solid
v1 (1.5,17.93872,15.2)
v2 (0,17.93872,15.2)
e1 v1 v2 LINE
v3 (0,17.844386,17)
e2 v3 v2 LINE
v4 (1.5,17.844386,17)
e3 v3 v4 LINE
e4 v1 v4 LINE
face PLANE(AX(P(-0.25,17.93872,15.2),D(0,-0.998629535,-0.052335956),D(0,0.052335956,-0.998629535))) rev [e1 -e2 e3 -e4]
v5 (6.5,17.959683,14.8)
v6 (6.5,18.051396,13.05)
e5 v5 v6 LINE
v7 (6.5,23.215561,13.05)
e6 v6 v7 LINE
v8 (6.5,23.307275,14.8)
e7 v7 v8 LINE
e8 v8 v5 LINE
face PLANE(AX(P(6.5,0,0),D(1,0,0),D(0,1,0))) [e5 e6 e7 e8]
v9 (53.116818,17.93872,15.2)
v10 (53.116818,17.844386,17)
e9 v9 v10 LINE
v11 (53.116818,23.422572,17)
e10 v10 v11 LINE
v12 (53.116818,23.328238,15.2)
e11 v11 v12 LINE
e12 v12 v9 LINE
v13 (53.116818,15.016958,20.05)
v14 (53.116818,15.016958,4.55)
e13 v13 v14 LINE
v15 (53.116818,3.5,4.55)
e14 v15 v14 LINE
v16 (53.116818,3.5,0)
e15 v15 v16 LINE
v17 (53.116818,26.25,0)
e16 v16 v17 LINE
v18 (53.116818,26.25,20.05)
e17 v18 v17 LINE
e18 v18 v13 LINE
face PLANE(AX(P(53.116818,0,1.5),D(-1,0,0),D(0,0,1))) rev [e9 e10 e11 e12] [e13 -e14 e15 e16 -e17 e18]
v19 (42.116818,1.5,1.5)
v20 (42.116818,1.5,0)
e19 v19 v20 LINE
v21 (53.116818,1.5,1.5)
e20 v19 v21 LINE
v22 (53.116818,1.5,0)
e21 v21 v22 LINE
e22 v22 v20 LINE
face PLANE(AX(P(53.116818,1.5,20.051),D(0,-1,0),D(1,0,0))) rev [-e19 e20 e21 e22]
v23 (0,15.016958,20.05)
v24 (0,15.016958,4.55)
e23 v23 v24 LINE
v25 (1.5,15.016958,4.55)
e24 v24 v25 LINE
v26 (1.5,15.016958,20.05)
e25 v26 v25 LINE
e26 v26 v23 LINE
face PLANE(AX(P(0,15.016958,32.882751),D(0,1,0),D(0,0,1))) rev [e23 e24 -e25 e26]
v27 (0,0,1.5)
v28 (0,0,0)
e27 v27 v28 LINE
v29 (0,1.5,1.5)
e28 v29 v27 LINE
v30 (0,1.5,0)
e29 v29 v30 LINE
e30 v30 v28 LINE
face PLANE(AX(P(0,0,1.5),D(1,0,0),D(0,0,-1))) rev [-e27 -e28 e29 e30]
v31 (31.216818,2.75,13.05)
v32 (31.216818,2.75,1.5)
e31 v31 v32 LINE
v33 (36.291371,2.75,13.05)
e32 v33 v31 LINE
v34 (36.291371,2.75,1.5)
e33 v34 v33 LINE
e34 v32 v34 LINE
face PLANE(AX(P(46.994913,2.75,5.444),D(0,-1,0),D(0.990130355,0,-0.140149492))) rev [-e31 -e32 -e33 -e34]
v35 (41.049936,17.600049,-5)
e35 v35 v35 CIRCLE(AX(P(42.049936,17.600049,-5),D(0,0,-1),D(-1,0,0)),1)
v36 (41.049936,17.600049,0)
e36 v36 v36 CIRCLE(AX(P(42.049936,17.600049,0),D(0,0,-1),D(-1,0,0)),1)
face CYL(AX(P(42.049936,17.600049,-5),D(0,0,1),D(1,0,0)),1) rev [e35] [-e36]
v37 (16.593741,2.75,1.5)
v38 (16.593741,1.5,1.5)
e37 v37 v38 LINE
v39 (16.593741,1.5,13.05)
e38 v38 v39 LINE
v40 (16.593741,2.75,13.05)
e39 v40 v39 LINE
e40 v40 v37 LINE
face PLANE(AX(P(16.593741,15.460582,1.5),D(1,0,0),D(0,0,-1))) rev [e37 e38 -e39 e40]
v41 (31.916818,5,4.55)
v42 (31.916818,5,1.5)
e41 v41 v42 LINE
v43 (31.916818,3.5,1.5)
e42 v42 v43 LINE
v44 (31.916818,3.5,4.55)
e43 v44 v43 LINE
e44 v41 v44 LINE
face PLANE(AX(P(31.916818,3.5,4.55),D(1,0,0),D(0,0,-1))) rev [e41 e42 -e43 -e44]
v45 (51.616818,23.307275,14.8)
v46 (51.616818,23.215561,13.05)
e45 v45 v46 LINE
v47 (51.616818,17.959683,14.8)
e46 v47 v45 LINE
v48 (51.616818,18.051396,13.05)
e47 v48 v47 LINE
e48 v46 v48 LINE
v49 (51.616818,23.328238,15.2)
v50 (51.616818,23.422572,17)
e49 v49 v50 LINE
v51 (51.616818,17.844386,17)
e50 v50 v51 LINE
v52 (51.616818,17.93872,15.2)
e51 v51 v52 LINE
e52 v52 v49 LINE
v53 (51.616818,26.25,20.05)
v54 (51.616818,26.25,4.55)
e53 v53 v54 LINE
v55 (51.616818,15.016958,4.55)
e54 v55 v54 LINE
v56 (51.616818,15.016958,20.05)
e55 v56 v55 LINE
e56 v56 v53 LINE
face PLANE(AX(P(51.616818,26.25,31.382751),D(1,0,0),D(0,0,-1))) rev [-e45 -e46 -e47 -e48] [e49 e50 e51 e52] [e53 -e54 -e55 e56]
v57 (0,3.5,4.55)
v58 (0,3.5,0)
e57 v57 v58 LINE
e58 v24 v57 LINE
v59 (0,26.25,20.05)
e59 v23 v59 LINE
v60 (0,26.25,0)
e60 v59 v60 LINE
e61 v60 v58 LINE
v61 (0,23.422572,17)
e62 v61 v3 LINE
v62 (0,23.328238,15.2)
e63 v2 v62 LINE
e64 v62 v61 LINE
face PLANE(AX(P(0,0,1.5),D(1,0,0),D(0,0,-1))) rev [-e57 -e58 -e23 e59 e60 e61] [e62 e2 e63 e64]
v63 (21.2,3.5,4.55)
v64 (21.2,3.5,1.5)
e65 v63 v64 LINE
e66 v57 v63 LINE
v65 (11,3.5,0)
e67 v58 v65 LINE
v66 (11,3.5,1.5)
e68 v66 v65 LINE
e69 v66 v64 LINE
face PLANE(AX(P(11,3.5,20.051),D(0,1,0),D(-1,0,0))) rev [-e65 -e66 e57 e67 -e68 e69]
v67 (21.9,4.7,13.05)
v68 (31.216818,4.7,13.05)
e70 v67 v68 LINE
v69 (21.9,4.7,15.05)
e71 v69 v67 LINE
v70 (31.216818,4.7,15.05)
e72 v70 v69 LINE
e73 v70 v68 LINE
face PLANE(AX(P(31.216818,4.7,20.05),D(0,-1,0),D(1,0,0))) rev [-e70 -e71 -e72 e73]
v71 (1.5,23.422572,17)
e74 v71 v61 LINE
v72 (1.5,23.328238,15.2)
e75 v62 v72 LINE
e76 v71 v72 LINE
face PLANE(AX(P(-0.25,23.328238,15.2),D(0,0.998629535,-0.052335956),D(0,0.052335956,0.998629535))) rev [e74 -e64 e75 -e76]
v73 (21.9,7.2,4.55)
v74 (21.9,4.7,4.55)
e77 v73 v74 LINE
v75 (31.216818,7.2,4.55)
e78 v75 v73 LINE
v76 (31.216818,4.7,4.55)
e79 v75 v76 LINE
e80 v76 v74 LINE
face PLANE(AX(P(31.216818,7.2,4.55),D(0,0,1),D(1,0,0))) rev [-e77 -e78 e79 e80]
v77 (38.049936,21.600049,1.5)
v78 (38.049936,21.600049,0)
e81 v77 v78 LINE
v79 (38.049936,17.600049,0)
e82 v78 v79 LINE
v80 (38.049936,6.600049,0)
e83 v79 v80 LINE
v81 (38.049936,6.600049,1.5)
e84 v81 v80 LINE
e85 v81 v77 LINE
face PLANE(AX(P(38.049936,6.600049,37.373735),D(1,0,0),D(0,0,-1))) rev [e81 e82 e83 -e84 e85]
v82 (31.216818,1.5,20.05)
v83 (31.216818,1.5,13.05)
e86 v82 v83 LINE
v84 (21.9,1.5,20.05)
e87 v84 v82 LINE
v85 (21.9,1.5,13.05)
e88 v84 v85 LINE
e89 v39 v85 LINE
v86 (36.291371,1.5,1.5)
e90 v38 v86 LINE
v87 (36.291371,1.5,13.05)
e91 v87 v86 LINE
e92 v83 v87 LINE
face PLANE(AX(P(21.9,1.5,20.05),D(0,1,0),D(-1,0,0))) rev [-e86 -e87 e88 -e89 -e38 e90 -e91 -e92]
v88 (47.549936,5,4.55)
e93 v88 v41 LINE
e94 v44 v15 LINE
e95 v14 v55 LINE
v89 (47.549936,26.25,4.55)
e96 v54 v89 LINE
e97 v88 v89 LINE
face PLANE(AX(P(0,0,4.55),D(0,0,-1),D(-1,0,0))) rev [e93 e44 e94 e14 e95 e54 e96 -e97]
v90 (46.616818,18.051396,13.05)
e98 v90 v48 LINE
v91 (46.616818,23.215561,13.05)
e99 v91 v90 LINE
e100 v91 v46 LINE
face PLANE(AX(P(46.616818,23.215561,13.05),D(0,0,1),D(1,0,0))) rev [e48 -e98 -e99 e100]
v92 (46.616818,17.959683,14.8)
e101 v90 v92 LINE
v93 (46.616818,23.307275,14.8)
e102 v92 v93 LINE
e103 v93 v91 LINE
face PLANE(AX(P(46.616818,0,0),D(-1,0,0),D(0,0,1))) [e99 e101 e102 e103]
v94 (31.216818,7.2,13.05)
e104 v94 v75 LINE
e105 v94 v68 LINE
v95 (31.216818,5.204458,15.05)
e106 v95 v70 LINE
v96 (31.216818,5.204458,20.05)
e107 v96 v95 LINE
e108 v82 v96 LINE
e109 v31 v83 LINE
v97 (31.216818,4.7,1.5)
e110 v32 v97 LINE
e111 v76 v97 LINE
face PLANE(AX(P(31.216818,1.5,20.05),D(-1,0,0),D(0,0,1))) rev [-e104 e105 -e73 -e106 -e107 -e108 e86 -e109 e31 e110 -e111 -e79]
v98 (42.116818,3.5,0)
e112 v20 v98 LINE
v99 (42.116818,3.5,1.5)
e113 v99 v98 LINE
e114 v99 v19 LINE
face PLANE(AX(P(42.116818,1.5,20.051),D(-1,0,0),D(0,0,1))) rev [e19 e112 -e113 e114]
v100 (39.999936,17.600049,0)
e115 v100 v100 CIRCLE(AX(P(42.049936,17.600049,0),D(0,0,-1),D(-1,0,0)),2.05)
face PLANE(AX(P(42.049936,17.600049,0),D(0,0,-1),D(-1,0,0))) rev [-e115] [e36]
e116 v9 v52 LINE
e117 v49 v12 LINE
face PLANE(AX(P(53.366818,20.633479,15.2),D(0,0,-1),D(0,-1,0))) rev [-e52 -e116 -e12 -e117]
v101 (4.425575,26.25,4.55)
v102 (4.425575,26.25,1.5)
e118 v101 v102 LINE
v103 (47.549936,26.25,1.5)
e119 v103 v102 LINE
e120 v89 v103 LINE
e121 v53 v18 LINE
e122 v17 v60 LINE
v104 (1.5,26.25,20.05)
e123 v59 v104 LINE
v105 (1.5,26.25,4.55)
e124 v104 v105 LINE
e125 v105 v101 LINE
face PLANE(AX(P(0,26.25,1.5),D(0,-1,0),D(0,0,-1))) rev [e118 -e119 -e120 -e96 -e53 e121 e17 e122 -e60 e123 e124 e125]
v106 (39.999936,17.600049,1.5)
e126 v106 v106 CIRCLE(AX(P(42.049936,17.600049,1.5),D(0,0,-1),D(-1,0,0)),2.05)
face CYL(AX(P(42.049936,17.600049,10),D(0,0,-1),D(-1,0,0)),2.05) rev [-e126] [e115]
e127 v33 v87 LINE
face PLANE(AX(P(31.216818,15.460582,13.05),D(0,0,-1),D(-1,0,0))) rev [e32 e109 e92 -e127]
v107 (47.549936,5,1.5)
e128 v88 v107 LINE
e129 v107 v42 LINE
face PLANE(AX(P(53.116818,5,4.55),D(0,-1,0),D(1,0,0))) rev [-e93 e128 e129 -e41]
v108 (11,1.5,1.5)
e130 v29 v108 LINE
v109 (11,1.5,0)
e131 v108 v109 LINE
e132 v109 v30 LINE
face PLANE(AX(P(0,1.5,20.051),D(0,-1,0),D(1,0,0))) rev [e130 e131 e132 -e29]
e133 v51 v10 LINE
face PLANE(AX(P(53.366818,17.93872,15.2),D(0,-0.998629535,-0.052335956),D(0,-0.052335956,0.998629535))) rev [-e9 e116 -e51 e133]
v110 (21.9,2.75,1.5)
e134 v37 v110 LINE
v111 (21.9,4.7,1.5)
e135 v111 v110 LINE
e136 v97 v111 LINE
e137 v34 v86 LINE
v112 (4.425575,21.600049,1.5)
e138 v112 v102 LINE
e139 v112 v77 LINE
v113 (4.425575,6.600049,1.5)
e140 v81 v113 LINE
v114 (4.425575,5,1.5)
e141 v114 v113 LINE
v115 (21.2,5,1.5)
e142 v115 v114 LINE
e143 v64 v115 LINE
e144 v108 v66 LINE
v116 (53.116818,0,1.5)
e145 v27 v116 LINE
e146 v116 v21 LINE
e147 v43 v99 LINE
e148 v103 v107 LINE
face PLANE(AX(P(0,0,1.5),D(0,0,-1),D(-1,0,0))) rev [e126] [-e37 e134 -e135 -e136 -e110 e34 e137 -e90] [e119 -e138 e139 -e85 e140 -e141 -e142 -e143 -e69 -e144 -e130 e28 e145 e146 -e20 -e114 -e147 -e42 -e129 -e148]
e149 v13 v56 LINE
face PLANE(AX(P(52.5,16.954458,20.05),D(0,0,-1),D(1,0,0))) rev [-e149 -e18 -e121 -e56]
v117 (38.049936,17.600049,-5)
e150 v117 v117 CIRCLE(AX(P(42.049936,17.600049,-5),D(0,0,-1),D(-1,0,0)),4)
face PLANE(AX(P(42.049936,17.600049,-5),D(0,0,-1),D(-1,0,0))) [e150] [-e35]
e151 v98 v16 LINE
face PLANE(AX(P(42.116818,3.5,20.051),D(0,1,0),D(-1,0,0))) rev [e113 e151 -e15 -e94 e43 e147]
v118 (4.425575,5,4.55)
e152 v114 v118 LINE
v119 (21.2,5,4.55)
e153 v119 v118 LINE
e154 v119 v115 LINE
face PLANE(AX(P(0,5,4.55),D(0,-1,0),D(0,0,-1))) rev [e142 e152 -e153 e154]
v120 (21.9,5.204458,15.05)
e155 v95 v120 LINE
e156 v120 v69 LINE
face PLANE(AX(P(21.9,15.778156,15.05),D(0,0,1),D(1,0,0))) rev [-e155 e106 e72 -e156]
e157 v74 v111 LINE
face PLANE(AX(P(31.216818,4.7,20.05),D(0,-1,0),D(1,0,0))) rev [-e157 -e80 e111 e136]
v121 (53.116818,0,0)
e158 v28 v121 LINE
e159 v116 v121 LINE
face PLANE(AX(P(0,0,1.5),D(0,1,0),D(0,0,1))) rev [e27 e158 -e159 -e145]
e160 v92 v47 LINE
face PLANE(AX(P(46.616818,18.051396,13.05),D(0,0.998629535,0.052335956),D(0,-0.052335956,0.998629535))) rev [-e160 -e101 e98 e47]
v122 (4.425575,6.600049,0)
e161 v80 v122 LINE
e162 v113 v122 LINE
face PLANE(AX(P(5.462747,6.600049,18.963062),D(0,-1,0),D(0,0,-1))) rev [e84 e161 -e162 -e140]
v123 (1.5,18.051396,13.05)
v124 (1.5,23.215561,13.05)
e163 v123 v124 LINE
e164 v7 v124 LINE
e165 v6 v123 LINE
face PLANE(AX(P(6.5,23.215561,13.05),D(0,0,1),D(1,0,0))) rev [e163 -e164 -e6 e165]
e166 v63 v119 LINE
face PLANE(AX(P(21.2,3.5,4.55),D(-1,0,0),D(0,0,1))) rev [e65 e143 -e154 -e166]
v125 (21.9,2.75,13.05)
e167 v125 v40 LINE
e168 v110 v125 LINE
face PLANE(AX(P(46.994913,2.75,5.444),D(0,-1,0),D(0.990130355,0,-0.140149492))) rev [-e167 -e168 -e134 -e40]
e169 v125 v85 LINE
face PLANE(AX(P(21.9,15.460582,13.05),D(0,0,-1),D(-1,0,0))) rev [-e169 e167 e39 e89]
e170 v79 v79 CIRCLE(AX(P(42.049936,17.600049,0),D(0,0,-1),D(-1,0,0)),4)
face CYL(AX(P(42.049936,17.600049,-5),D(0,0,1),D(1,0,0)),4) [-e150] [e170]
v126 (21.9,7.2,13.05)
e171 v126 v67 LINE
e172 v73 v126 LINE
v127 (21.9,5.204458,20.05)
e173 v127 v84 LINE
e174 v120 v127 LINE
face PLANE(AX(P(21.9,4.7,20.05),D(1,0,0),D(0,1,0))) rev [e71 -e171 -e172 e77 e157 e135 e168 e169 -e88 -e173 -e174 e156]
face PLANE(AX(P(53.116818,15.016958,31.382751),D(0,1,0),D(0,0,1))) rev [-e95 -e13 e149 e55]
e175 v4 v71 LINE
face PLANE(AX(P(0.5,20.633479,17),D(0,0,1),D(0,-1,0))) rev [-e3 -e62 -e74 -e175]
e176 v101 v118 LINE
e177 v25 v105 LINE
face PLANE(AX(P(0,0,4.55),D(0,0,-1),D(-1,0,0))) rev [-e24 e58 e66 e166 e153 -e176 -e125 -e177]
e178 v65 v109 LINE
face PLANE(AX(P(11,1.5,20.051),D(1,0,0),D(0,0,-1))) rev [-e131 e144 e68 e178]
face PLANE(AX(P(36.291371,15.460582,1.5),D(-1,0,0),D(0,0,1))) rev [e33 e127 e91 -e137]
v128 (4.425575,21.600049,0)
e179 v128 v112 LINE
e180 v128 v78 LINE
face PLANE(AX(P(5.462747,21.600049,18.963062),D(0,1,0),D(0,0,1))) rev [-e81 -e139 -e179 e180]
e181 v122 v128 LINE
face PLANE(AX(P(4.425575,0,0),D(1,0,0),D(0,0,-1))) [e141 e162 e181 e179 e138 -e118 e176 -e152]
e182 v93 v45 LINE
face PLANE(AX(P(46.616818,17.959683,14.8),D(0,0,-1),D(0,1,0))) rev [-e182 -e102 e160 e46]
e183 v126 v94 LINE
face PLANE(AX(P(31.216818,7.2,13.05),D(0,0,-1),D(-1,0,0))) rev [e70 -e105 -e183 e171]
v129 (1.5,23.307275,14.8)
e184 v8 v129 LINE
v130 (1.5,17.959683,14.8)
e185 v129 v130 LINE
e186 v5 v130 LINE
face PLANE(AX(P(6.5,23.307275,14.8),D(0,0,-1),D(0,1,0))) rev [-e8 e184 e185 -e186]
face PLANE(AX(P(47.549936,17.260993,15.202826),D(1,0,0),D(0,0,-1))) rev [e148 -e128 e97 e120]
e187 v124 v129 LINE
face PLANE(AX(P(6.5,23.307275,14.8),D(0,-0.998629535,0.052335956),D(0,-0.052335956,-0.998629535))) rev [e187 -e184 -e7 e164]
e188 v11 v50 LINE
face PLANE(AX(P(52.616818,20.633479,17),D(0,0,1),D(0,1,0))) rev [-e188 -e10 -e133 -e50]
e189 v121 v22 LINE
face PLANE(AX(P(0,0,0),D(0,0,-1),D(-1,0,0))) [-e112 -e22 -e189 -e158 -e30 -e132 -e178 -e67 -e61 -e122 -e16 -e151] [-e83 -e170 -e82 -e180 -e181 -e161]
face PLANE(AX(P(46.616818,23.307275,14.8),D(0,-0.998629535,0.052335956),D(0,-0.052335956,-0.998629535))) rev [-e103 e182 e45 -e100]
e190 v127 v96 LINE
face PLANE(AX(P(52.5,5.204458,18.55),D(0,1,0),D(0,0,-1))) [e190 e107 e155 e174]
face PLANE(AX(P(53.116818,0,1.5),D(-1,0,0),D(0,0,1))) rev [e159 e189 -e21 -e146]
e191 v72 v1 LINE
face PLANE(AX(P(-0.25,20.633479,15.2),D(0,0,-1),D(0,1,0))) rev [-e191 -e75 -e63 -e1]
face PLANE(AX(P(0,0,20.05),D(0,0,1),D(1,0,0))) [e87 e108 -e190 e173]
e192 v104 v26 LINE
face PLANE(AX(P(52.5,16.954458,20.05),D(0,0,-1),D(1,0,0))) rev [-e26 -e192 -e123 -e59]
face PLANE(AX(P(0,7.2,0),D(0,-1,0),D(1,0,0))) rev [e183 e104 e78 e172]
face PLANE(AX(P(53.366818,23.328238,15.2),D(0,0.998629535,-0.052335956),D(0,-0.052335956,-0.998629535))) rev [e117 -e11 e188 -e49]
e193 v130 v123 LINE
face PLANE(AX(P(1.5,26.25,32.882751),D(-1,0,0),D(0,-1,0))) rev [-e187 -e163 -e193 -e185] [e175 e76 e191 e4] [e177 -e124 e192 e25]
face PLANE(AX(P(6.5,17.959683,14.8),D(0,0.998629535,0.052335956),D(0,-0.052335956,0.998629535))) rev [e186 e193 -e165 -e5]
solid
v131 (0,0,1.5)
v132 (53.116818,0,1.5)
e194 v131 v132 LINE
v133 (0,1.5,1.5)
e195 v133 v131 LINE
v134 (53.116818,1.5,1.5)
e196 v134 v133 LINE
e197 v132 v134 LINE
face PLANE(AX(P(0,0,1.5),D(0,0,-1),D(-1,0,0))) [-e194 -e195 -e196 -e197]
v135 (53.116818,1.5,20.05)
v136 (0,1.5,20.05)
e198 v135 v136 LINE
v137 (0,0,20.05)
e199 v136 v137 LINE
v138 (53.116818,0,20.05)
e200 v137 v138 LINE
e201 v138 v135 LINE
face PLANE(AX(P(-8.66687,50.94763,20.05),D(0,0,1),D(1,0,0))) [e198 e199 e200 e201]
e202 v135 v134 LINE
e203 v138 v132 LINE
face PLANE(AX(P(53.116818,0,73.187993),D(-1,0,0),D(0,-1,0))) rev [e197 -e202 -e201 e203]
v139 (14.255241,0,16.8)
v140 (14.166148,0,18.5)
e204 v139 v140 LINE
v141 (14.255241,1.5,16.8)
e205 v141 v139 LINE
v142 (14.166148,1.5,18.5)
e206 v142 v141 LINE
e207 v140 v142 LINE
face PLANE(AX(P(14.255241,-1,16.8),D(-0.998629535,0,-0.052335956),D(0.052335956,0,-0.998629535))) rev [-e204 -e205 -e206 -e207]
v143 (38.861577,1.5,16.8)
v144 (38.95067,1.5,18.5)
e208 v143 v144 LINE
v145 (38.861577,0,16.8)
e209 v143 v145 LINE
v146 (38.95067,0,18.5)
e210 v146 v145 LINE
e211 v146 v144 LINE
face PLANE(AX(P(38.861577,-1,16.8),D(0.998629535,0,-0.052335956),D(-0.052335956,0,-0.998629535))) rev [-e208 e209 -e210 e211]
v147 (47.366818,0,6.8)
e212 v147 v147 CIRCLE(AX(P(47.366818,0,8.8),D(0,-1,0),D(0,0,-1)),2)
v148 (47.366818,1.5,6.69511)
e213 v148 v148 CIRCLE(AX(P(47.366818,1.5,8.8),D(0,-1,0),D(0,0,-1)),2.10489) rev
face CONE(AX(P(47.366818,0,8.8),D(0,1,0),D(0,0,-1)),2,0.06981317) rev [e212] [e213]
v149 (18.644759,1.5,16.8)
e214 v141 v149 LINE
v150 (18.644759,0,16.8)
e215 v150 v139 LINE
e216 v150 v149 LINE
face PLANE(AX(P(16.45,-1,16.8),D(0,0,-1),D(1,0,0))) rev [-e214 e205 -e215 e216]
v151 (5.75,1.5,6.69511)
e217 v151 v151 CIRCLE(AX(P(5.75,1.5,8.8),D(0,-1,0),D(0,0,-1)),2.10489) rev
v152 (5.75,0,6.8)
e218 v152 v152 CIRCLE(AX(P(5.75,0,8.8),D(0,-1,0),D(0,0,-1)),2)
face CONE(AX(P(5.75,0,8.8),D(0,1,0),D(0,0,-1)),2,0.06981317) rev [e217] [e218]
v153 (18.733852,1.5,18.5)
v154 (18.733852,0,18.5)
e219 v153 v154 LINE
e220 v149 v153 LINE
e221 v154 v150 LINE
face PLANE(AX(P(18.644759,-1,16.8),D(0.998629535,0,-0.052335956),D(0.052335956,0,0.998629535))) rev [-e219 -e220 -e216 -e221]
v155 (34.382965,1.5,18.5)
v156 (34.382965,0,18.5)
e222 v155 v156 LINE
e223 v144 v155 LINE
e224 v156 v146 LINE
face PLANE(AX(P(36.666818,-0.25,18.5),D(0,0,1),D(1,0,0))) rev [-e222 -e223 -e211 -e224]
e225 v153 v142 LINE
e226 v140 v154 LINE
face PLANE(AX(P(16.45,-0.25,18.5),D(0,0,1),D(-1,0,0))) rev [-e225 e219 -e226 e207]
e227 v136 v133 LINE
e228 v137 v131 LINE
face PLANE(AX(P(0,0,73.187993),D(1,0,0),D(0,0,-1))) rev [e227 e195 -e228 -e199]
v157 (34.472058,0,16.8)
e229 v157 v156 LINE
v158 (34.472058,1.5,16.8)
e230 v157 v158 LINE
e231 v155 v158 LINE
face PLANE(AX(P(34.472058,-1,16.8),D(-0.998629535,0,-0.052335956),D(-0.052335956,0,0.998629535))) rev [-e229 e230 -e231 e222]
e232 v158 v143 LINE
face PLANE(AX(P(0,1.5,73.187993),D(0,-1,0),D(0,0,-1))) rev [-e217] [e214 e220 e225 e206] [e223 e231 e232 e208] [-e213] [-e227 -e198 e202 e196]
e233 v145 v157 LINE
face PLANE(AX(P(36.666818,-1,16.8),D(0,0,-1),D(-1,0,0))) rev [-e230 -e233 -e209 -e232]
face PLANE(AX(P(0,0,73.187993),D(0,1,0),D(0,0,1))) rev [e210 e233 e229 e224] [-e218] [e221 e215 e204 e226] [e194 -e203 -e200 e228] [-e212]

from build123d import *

# Parameters (mm, degrees)
SKETCH1_W                              = 53.116817528
SKETCH1_H                              = 26.25
FRONT_SIDE_MAIN_DEPTH                  = 1.5
RESET_HOLE_DEPTH                       = 3.75
SKETCH15_W                             = 3.966010581
SKETCH15_H                             = 2.112155191
SKETCH15_W_2                           = 3.557190409
SKETCH15_H_2                           = 2.236587576
SKETCH15_W_3                           = 3.981127105
SKETCH15_H_3                           = 2.476855865
COMPONENT_HOLES_DEPTH                  = 3.75
SKETCH16_W                             = 10.85
SKETCH16_H                             = 14.75
MICROPHONE_HOLE_DEPTH                  = 1.5
SKETCH24_W                             = 1.5
SKETCH24_H                             = 11.233042059
RIGHT_SIDE_TOP_DEPTH                   = 18.55
SNAP_GROOVE_RIGHT_DEPTH                = 1.5
SKETCH26_W                             = 1.5
SKETCH26_H                             = 11.233042059
LEFT_SIDE_TOP_DEPTH                    = 18.55
SNAP_START                             = 51.616817528
SNAP_GROOVE_LEFT_DEPTH                 = 1.5
SKETCH20_W                             = 53.116817528
SKETCH20_H                             = 1.5
BOTTOM_BASE_DEPTH                      = 18.55
SERVO_START                            = -1.5
SKETCH18_W                             = 9.316817528
SKETCH18_H                             = 3.2
SERVO_SEPERATOR_BOTTOM_DEPTH           = 20.05
SKETCH34_W                             = 2.537171882
SKETCH34_H                             = 15
PROGRAMMING_HOLE_DEPTH                 = 3.75
SKETCH38_W                             = 9.316817528
SKETCH38_H                             = 5
BACK_BATTERY_HOLDER_BOTTOM_DEPTH       = 0.504457941
SKETCH40_R                             = 2
SERVO_ARM_HOLES_BOTTOM_DEPTH           = 1.5
SERVO_ARM_HOLES_BOTTOM_DRAFT           = 4
SERVO_ARM_HOLES_BOTTOM_PROFILE_2_DEPTH = 1.5
SERVO_ARM_HOLES_BOTTOM_PROFILE_2_DRAFT = 4
SKETCH47_W                             = 11
SKETCH47_H                             = 2
SOLAR_ARM_HOLES_FRONT_DEPTH            = 1.5
SKETCH48_W                             = 9.316817528
SKETCH48_H                             = 8.5
SERVO_TALLER_SEPERATOR_BOTTOM_DEPTH    = 2.5
SKETCH51_W                             = 5.074553148
SKETCH51_H                             = 11.55
SKETCH51_W_2                           = 5.306259021
SERVO_LIFTERS_BOTTOM_DEPTH             = 1.25
SKETCH52_W                             = 21.2
SKETCH52_H                             = 1.5
SERVO_UNDER_SUPPORT_DEPTH              = 3.05
SKETCH49_W                             = 1.573389805
SKETCH49_H                             = 10.535992885
SERVO_2_CASE_SPACER_FRONT_DEPTH        = 3.05
SERVO_TOP_SUPPORT_RIGHT_DEPTH          = 5
SERVO_TOP_SUPPORT_LEFT_DEPTH           = 5
SNAP_GROOVE_BOTTOM_RIGHT_DEPTH         = 1.5
SNAP_GROOVE_BOTTOM_LEFT_DEPTH          = 1.5
SKETCH56_W                             = 32.587188542
SKETCH56_H                             = 15
CUT_EXTRUDE1_DEPTH                     = 1.5
SKETCH57_W                             = 8.5
SKETCH57_H                             = 1.5
BOSS_EXTRUDE1_DEPTH                    = 14.75
SKETCH58_R                             = 2.05
CUT_EXTRUDE2_DEPTH                     = 10
SKETCH59_W                             = 1.5
SKETCH59_H                             = 15
BOSS_EXTRUDE2_DEPTH                    = 1.5
SKETCH60_W                             = 2.925575138
SKETCH60_H                             = 19.525
BOSS_EXTRUDE3_DEPTH                    = 3.05
SKETCH62_W                             = 3.05
SKETCH62_H                             = 10.535992885
BOSS_EXTRUDE4_DEPTH                    = 3.993492161
SKETCH63_W                             = 4.066881966
SKETCH63_H                             = 3.05
BOSS_EXTRUDE5_DEPTH                    = 8.989007115
SKETCH64_W                             = 3.05
SKETCH64_H                             = 8.291957941
BOSS_EXTRUDE6_DEPTH                    = 1.5
BOSS_EXTRUDE7_REACH                    = 62.039
SKETCH65_W                             = 4.425575138
SKETCH65_H                             = 3.05
BOSS_EXTRUDE8_REACH                    = 62.039
SKETCH66_W                             = 5.566881966
SKETCH66_H                             = 3.05
SKETCH67_R                             = 4
SKETCH67_R_2                           = 1
BOSS_EXTRUDE9_DEPTH                    = 5


# Read off the part's stored shape, not the designer's step: Snap Groove - Right, Snap Groove - Left, Snap Groove - Bottom Right, Snap Groove - Bottom Left
with BuildPart() as part:
    # Sketch1 → Front Side - Main (new body)
    with BuildSketch(Plane.XY):
        with Locations((26.558408764, 13.125)):
            Rectangle(SKETCH1_W, SKETCH1_H)
    extrude(amount=FRONT_SIDE_MAIN_DEPTH)

    # Reset Hole Sketch → Reset Hole (cut)
    with BuildSketch(Plane(origin=(0, 0, 3.75), x_dir=(-1, 0, 0), z_dir=(0, 0, -1))):
        Polygon((-31.190735744, 17.626168756), (-34.141748042, 17.658585925), (-36.251351249, 15.594827519), (-36.283768419, 12.643815222), (-34.220010013, 10.534212015), (-31.268997715, 10.501794845), (-29.159394508, 12.565553251), (-29.126977338, 15.516565548), align=None)
    extrude(amount=RESET_HOLE_DEPTH, mode=Mode.SUBTRACT)

    # Sketch15 → Component Holes (cut)
    with BuildSketch(Plane(origin=(0, 0, 3.75), x_dir=(-1, 0, 0), z_dir=(0, 0, -1))):
        Polygon((-21.737702993, 20.027277789), (-15.857179586, 14.146754382), (-21.737702993, 8.266230975), (-27.6182264, 14.146754382), align=None)
        with Locations((-11.649935563, 9.695513201)):
            Rectangle(SKETCH15_W, SKETCH15_H)
        with Locations((-11.599935563, 14.270513201)):
            Rectangle(SKETCH15_W_2, SKETCH15_H_2)
        with Locations((-9.949935563, 18.095513201)):
            Rectangle(SKETCH15_W_3, SKETCH15_H_3)
    extrude(amount=COMPONENT_HOLES_DEPTH, mode=Mode.SUBTRACT)

    # Sketch16 → Microphone Hole (cut)
    with BuildSketch(Plane(origin=(0, 0, 0), x_dir=(-1, 0, 0), z_dir=(0, 0, -1))):
        with Locations((-41.124935562, 14.1)):
            Rectangle(SKETCH16_W, SKETCH16_H)
    extrude(amount=-MICROPHONE_HOLE_DEPTH, mode=Mode.SUBTRACT)

    # Sketch24 → Right Side - Top (add)
    with BuildSketch(Plane.XY.offset(1.5)):
        with Locations((0.75, 20.633478971)):
            Rectangle(SKETCH24_W, SKETCH24_H)
    extrude(amount=RIGHT_SIDE_TOP_DEPTH)

    # Snap Groove - Right outline → Snap Groove - Right (cut)
    with BuildSketch(Plane.YZ):
        Polygon((17.938719748, 15.2), (23.328238192, 15.2), (23.422572195, 17), (17.844385746, 17), align=None)
    extrude(amount=SNAP_GROOVE_RIGHT_DEPTH, mode=Mode.SUBTRACT)

    # Sketch26 → Left Side - Top (add)
    with BuildSketch(Plane.XY.offset(1.5)):
        with Locations((52.366817528, 20.633478971)):
            Rectangle(SKETCH26_W, SKETCH26_H)
    extrude(amount=LEFT_SIDE_TOP_DEPTH)

    # Snap Groove - Left outline → Snap Groove - Left (cut)
    with BuildSketch(Plane.YZ.offset(SNAP_START)):
        Polygon((17.938719748, 15.2), (23.328238192, 15.2), (23.422572195, 17), (17.844385746, 17), align=None)
    extrude(amount=SNAP_GROOVE_LEFT_DEPTH, mode=Mode.SUBTRACT)

    # Sketch18 → Servo Seperator - Bottom (add)
    with BuildSketch(Plane.XY.offset(1.5).offset(SERVO_START)):
        with Locations((26.558408764, 3.1)):
            Rectangle(SKETCH18_W, SKETCH18_H)
    extrude(amount=SERVO_SEPERATOR_BOTTOM_DEPTH)

    # Sketch34 → Programming Hole (cut)
    with BuildSketch(Plane(origin=(0, 0, 0), x_dir=(-1, 0, 0), z_dir=(0, 0, -1))):
        with Locations((-4.194161079, 14.100049249)):
            Rectangle(SKETCH34_W, SKETCH34_H)
    extrude(amount=-PROGRAMMING_HOLE_DEPTH, mode=Mode.SUBTRACT)

    # Sketch38 → Back Battery Holder - Bottom (add)
    with BuildSketch(Plane(origin=(0, 4.7, 0), x_dir=(1, 0, 0), z_dir=(0, 1, 0))):
        with Locations((26.558408764, -17.55)):
            Rectangle(SKETCH38_W, SKETCH38_H)
    extrude(amount=BACK_BATTERY_HOLDER_BOTTOM_DEPTH)

    # Sketch47 → Solar Arm Holes - Front (cut)
    with BuildSketch(Plane(origin=(0, 0, 0), x_dir=(-1, 0, 0), z_dir=(0, 0, -1))):
        with Locations((-47.616817528, 2.5)):
            Rectangle(SKETCH47_W, SKETCH47_H)
        with Locations((-5.5, 2.5)):
            Rectangle(SKETCH47_W, SKETCH47_H)
    extrude(amount=-SOLAR_ARM_HOLES_FRONT_DEPTH, mode=Mode.SUBTRACT)

    # Sketch48 → Servo Taller Seperator - Bottom (add)
    with BuildSketch(Plane(origin=(0, 4.7, 0), x_dir=(1, 0, 0), z_dir=(0, 1, 0))):
        with Locations((26.558408764, -8.8)):
            Rectangle(SKETCH48_W, SKETCH48_H)
    extrude(amount=SERVO_TALLER_SEPERATOR_BOTTOM_DEPTH)

    # Sketch51 → Servo Lifters - Bottom (add)
    with BuildSketch(Plane(origin=(0, 1.5, 0), x_dir=(1, 0, 0), z_dir=(0, 1, 0))):
        with Locations((33.754094102, -7.275)):
            Rectangle(SKETCH51_W, SKETCH51_H)
        with Locations((19.24687049, -7.275)):
            Rectangle(SKETCH51_W_2, SKETCH51_H)
    extrude(amount=SERVO_LIFTERS_BOTTOM_DEPTH)

    # Sketch52 → Servo Under Support (add)
    with BuildSketch(Plane.XY.offset(1.5)):
        with Locations((10.6, 4.25)):
            Rectangle(SKETCH52_W, SKETCH52_H)
        with Locations((42.516817528, 4.25)):
            Rectangle(SKETCH52_W, SKETCH52_H)
    extrude(amount=SERVO_UNDER_SUPPORT_DEPTH)

    # Sketch49 → Servo 2 Case Spacer - Front (add)
    with BuildSketch(Plane.XY.offset(1.5)):
        with Locations((48.336630465, 11.992996443)):
            Rectangle(SKETCH49_W, SKETCH49_H)
    extrude(amount=SERVO_2_CASE_SPACER_FRONT_DEPTH)

    # Sketch53 → Servo Top Support - Right (add)
    with BuildSketch(Plane(origin=(1.5, 0, 0), x_dir=(0, 0, -1), z_dir=(1, 0, 0))):
        Polygon((-14.8, 23.307275081), (-13.05, 23.215561467), (-13.05, 18.051396474), (-14.8, 17.95968286), align=None)
    extrude(amount=SERVO_TOP_SUPPORT_RIGHT_DEPTH)

    # Sketch55 → Servo Top Support - Left (add)
    with BuildSketch(Plane.ZY.offset(-51.616817528)):
        Polygon((14.8, 17.95968286), (14.8, 23.307275081), (13.05, 23.215561467), (13.05, 18.051396474), align=None)
    extrude(amount=SERVO_TOP_SUPPORT_LEFT_DEPTH)

    # Sketch56 → Cut-Extrude1 (cut)
    with BuildSketch(Plane(origin=(0, 0, 0), x_dir=(-1, 0, 0), z_dir=(0, 0, -1))):
        with Locations((-21.756341291, 14.100049249)):
            Rectangle(SKETCH56_W, SKETCH56_H)
    extrude(amount=-CUT_EXTRUDE1_DEPTH, mode=Mode.SUBTRACT)

    # Sketch57 → Boss-Extrude1 (add)
    with BuildSketch(Plane.XZ.offset(-21.475)):
        with Locations((42.299935562, 0.75)):
            Rectangle(SKETCH57_W, SKETCH57_H)
    extrude(amount=BOSS_EXTRUDE1_DEPTH)

    # Sketch58 → Cut-Extrude2 (cut)
    with BuildSketch(Plane(origin=(0, 0, 0), x_dir=(-1, 0, 0), z_dir=(0, 0, -1))):
        with Locations((-42.049935562, 17.600049249)):
            Circle(SKETCH58_R)
    extrude(amount=-CUT_EXTRUDE2_DEPTH, mode=Mode.SUBTRACT)

    # Sketch59 → Boss-Extrude2 (add)
    with BuildSketch(Plane(origin=(2.925575138, 0, 0), x_dir=(0, 0, -1), z_dir=(1, 0, 0))):
        with Locations((-0.75, 14.100049249)):
            Rectangle(SKETCH59_W, SKETCH59_H)
    extrude(amount=BOSS_EXTRUDE2_DEPTH)

    # Sketch60 → Boss-Extrude3 (add)
    with BuildSketch(Plane.XY.offset(1.5)):
        with Locations((2.962787569, 16.4875)):
            Rectangle(SKETCH60_W, SKETCH60_H)
    extrude(amount=BOSS_EXTRUDE3_DEPTH)

    # Sketch62 → Boss-Extrude4 (add)
    with BuildSketch(Plane(origin=(49.123325367, 0, 0), x_dir=(0, 0, -1), z_dir=(1, 0, 0))):
        with Locations((-3.025, 11.992996443)):
            Rectangle(SKETCH62_W, SKETCH62_H)
    extrude(amount=BOSS_EXTRUDE4_DEPTH)

    # Sketch63 → Boss-Extrude5 (add)
    with BuildSketch(Plane(origin=(0, 17.260992885, 0), x_dir=(1, 0, 0), z_dir=(0, 1, 0))):
        with Locations((49.583376545, -3.025)):
            Rectangle(SKETCH63_W, SKETCH63_H)
    extrude(amount=BOSS_EXTRUDE5_DEPTH)

    # Sketch64 → Boss-Extrude6 (add)
    with BuildSketch(Plane.ZY.offset(-1.5)):
        with Locations((3.025, 10.870978971)):
            Rectangle(SKETCH64_W, SKETCH64_H)
    extrude(amount=BOSS_EXTRUDE6_DEPTH)

    # Sketch65 → Boss-Extrude7 (add, up to next)
    with BuildSketch(Plane.XZ.offset(-6.725), mode=Mode.PRIVATE) as boss_extrude7_sk1:
        with Locations((2.212787569, 3.025)):
            Rectangle(SKETCH65_W, SKETCH65_H)
    boss_extrude7_tool1 = extrude(boss_extrude7_sk1.sketch, amount=BOSS_EXTRUDE7_REACH, mode=Mode.PRIVATE) - part.part
    add(boss_extrude7_tool1.solids().sort_by_distance((2.212788, 6.725, 3.025))[0])

    # Sketch66 → Boss-Extrude8 (add, up to next)
    with BuildSketch(Plane.XZ.offset(-6.725), mode=Mode.PRIVATE) as boss_extrude8_sk1:
        with Locations((50.333376545, 3.025)):
            Rectangle(SKETCH66_W, SKETCH66_H)
    boss_extrude8_tool1 = extrude(boss_extrude8_sk1.sketch, amount=BOSS_EXTRUDE8_REACH, mode=Mode.PRIVATE) - part.part
    add(boss_extrude8_tool1.solids().sort_by_distance((50.333377, 6.725, 3.025))[0])

    # Sketch67 → Boss-Extrude9 (add)
    with BuildSketch(Plane(origin=(0, 0, 0), x_dir=(-1, 0, 0), z_dir=(0, 0, -1))):
        with Locations((-42.049935562, 17.600049249)):
            Circle(SKETCH67_R)
        with Locations((-42.049935562, 17.600049249)):
            Circle(SKETCH67_R_2, mode=Mode.SUBTRACT)
    extrude(amount=BOSS_EXTRUDE9_DEPTH)


with BuildPart() as body_2:
    # Sketch20 → Bottom Base (new body)
    with BuildSketch(Plane.XY.offset(1.5)):
        with Locations((26.558408764, 0.75)):
            Rectangle(SKETCH20_W, SKETCH20_H)
    extrude(amount=BOTTOM_BASE_DEPTH)


with BuildPart() as servo_arm_holes_bottom_tool:
    # Sketch40 → Servo arm Holes - Bottom (with draft: the straight prism first)
    with BuildSketch(Plane.XZ):
        with Locations((47.366817528, 8.8)):
            Circle(SKETCH40_R)
    extrude(amount=-SERVO_ARM_HOLES_BOTTOM_DEPTH)
    # Servo arm Holes - Bottom: the draft: its side faces are tilted about the plane it starts from
    servo_arm_holes_bottom_sides = [servo_arm_holes_bottom_tool.faces().sort_by_distance(p)[0] for p in [
        (45.366817528, 0.75, 8.8),
    ]]
    draft(servo_arm_holes_bottom_sides, Plane.XZ, SERVO_ARM_HOLES_BOTTOM_DRAFT)


with BuildPart() as body_2_1:
    add(body_2.part)

    # Servo arm Holes - Bottom: cut by servo_arm_holes_bottom_tool
    add(servo_arm_holes_bottom_tool.part, mode=Mode.SUBTRACT)


with BuildPart() as servo_arm_holes_bottom_profile_2_tool:
    # Sketch40 → Servo arm Holes - Bottom profile 2 (with draft: the straight prism first)
    with BuildSketch(Plane.XZ):
        with Locations((5.75, 8.8)):
            Circle(SKETCH40_R)
    extrude(amount=-SERVO_ARM_HOLES_BOTTOM_PROFILE_2_DEPTH)
    # Servo arm Holes - Bottom profile 2: the draft: its side faces are tilted about the plane it starts from
    servo_arm_holes_bottom_profile_2_sides = [servo_arm_holes_bottom_profile_2_tool.faces().sort_by_distance(p)[0] for p in [
        (3.75, 0.75, 8.8),
    ]]
    draft(servo_arm_holes_bottom_profile_2_sides, Plane.XZ, SERVO_ARM_HOLES_BOTTOM_PROFILE_2_DRAFT)


with BuildPart() as body_2_2:
    add(body_2_1.part)

    # Servo arm Holes - Bottom profile 2: cut by servo_arm_holes_bottom_profile_2_tool
    add(servo_arm_holes_bottom_profile_2_tool.part, mode=Mode.SUBTRACT)

    # Snap Groove - Bottom Right outline → Snap Groove - Bottom Right (cut)
    with BuildSketch(Plane(origin=(0, 0, 0), x_dir=(1, 0, 0), z_dir=(0, 1, 0))):
        Polygon((14.166147553, -18.5), (18.733852447, -18.5), (18.644759222, -16.8), (14.255240778, -16.8), align=None)
    extrude(amount=SNAP_GROOVE_BOTTOM_RIGHT_DEPTH, mode=Mode.SUBTRACT)

    # Snap Groove - Bottom Left outline → Snap Groove - Bottom Left (cut)
    with BuildSketch(Plane(origin=(0, 0, 0), x_dir=(1, 0, 0), z_dir=(0, 1, 0))):
        Polygon((38.950669975, -18.5), (38.86157675, -16.8), (34.472058306, -16.8), (34.382965081, -18.5), align=None)
    extrude(amount=SNAP_GROOVE_BOTTOM_LEFT_DEPTH, mode=Mode.SUBTRACT)


solid = Compound([part.part, body_2_2.part])
